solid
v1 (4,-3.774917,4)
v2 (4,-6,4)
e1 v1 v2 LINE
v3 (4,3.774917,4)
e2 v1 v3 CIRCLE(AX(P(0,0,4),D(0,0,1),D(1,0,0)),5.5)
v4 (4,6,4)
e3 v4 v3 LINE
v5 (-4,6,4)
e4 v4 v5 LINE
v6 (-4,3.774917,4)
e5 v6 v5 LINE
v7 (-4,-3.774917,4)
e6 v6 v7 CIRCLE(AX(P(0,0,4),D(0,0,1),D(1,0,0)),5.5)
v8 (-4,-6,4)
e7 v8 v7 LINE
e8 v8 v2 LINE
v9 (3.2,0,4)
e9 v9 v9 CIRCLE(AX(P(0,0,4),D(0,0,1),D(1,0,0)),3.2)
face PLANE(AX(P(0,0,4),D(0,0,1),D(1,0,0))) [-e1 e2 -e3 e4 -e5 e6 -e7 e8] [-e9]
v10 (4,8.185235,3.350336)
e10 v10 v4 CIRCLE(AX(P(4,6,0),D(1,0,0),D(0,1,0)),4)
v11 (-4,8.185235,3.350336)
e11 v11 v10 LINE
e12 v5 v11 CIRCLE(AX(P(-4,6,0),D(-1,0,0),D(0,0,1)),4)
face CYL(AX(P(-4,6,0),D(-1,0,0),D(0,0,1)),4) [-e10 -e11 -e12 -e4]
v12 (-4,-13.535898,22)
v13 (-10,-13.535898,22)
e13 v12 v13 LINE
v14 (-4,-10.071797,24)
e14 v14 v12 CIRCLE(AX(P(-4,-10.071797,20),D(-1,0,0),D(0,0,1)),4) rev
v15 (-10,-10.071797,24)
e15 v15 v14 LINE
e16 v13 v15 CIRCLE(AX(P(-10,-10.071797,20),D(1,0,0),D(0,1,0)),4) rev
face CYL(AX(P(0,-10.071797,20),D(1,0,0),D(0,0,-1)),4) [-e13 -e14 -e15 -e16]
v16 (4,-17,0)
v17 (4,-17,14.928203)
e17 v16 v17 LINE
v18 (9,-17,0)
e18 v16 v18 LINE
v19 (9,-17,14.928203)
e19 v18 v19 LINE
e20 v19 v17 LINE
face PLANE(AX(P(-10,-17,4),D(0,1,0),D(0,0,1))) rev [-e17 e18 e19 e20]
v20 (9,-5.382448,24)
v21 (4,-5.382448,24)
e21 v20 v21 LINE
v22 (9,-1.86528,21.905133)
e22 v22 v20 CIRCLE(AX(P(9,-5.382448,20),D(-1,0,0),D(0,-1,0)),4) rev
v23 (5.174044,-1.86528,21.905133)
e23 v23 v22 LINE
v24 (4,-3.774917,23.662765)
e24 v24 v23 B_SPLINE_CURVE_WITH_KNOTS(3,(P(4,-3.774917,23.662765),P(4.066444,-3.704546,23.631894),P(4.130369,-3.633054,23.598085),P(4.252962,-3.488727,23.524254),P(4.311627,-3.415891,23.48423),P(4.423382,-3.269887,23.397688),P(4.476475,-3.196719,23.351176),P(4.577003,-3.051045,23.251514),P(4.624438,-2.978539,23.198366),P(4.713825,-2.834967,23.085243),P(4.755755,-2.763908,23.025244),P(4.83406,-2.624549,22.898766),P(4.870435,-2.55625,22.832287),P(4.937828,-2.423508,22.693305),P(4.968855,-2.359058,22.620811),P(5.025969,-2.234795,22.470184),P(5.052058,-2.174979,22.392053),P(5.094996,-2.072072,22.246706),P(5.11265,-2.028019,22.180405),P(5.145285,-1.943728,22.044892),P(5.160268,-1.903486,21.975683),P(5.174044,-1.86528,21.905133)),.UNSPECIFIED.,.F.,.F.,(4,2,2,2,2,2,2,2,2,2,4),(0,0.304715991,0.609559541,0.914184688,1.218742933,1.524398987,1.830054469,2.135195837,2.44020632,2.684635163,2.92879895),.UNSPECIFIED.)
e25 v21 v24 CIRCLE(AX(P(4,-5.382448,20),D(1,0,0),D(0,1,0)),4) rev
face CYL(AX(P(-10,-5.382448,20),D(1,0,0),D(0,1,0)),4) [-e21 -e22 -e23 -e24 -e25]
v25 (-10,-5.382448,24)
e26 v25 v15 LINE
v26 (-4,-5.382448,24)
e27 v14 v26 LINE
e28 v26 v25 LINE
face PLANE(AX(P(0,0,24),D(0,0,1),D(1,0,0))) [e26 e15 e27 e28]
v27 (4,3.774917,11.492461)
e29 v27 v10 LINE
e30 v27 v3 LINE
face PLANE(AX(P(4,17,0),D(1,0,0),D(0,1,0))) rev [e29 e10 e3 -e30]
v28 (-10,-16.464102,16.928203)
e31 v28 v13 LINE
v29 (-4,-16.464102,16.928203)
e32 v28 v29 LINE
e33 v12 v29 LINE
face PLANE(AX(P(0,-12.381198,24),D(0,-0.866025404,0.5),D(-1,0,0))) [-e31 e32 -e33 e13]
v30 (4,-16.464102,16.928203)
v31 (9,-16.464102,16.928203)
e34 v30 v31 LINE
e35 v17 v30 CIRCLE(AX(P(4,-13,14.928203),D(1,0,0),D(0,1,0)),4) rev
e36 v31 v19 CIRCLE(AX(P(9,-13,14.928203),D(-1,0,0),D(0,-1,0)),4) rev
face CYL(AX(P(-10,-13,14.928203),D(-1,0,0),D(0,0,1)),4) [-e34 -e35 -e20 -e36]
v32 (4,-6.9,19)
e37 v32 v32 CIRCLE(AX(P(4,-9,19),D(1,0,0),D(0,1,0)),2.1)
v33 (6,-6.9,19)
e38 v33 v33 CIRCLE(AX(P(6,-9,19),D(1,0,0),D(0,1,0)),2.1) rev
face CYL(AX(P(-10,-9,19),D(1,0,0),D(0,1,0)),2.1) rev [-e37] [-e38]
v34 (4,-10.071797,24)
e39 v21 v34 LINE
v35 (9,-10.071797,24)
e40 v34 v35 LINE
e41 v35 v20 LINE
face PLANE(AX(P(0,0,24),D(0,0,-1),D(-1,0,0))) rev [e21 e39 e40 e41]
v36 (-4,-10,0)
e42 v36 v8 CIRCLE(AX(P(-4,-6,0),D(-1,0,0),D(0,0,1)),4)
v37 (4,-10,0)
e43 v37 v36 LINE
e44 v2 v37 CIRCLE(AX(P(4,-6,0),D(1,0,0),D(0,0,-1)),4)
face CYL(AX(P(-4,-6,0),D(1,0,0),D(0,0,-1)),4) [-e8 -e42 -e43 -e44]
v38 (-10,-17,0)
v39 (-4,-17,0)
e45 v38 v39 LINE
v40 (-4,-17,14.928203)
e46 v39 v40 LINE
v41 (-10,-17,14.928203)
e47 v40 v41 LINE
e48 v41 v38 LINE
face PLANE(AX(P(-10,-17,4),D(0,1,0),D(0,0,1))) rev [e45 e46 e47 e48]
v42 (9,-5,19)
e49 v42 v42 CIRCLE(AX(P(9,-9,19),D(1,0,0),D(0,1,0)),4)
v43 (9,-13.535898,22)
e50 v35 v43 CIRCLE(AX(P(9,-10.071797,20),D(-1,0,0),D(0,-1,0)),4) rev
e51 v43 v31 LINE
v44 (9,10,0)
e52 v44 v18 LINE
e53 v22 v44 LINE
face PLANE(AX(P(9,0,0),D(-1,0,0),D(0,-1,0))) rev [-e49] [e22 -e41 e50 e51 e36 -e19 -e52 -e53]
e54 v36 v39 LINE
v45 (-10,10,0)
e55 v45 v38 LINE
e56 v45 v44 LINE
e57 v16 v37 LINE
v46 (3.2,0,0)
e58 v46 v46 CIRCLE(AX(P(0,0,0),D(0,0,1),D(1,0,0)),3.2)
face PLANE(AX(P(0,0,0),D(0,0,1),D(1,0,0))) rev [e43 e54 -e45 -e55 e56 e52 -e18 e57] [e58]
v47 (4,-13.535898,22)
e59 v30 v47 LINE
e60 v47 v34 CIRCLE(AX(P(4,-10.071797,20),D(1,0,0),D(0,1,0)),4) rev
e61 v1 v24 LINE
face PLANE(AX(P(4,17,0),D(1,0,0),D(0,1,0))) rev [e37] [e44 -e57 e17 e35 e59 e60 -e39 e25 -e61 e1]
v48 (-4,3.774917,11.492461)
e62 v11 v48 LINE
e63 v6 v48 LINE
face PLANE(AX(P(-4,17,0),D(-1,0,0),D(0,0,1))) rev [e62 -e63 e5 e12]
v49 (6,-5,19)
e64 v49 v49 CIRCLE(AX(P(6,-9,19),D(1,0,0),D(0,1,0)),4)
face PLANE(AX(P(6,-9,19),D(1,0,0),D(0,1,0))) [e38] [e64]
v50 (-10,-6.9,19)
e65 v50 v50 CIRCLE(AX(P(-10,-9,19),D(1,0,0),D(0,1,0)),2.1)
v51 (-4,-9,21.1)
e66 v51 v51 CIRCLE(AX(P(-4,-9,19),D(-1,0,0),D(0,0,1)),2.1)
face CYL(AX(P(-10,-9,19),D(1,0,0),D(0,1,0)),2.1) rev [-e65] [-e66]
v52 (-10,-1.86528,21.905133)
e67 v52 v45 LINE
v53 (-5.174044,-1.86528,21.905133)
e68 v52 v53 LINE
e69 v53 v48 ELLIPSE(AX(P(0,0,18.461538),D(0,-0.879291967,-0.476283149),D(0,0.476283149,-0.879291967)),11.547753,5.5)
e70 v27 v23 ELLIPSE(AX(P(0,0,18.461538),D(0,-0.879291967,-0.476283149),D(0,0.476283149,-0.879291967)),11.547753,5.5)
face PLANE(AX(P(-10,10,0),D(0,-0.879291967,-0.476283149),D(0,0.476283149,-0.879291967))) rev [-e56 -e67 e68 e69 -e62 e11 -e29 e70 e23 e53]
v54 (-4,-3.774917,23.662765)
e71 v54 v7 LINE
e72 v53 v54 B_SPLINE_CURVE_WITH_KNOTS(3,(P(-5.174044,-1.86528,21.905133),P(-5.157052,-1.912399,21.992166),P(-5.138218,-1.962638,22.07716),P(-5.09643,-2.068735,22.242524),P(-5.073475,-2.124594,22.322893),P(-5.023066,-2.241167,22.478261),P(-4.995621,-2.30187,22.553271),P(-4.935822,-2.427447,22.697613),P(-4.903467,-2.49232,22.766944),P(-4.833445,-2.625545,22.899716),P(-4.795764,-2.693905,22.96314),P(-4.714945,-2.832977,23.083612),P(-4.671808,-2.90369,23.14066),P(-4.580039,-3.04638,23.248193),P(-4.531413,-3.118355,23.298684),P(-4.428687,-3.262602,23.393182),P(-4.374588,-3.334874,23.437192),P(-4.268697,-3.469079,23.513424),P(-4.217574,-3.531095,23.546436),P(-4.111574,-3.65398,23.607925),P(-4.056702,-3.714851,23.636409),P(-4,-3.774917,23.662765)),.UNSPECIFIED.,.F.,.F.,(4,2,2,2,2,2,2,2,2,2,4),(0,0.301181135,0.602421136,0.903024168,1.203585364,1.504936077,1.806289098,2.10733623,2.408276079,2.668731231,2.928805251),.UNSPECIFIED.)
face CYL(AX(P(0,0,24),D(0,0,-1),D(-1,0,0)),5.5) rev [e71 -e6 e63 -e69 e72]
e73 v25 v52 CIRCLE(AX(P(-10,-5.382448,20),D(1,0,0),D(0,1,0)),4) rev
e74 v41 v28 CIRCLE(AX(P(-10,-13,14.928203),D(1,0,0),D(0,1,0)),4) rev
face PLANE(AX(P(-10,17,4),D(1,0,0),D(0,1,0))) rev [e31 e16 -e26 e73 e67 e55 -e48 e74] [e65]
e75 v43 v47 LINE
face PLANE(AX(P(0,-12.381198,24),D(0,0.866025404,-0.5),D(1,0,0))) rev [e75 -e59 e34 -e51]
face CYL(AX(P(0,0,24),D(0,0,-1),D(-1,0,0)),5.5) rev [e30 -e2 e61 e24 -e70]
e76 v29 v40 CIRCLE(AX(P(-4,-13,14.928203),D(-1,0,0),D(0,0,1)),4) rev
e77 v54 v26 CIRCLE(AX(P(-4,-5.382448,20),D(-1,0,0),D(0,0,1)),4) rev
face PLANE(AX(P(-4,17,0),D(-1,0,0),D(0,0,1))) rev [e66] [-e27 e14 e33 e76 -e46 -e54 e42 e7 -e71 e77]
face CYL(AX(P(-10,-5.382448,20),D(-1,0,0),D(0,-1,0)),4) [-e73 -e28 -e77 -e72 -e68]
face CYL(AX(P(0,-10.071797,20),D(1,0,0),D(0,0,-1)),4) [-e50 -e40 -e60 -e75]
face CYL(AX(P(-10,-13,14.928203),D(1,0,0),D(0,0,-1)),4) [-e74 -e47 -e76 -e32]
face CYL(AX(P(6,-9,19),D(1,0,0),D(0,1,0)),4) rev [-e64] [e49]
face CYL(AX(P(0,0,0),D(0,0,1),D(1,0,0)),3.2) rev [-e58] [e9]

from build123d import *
from OCP.BRepFilletAPI import BRepFilletAPI_MakeChamfer

# Parameters (mm, degrees)
ESQUISSE1_W             = 20
ESQUISSE1_H             = 34
BOSS_EXTRU_1_DEPTH      = 4
ESQUISSE2_W             = 8
ESQUISSE2_H             = 7
ENL_V_MAT_EXTRU_1_DEPTH = 21.124611797
CONG_1_R                = 4
ESQUISSE3_W             = 6
ESQUISSE3_H             = 34
BOSS_EXTRU_2_DEPTH      = 20
ESQUISSE4_R             = 2.1
ENL_V_MAT_EXTRU_2_DEPTH = 36.566838488
CHANFREIN1_SIZE         = 8
CHANFREIN1_SIZE2        = 4.618802154
CONG_2_R                = 4
ESQUISSE5_R             = 3.2
ENL_V_MAT_EXTRU_3_DEPTH = 29.08914381
ESQUISSE6_R             = 5.5
ENL_V_MAT_EXTRU_4_DEPTH = 29.08914381
ENL_V_MAT_EXTRU_5_DEPTH = 36.566838488
CONG_3_R                = 4
ESQUISSE9_W             = 30.59391243
ESQUISSE9_H             = 32.996523038
ENL_V_MAT_EXTRU_6_DEPTH = 1
ESQUISSE10_R            = 4
ENL_V_MAT_EXTRU_7_DEPTH = 3


with BuildPart() as part:
    # Esquisse1 → Boss.-Extru.1 (new body)
    with BuildSketch(Plane.XY):
        Rectangle(ESQUISSE1_W, ESQUISSE1_H)
    extrude(amount=BOSS_EXTRU_1_DEPTH)

    # Esquisse2 → Enlèv. mat.-Extru.1 (cut, through all)
    with BuildSketch(Plane.XY.offset(4)):
        with Locations((0, 13.5)):
            Rectangle(ESQUISSE2_W, ESQUISSE2_H)
        with Locations((0, -13.5)):
            Rectangle(ESQUISSE2_W, ESQUISSE2_H)
    extrude(amount=-ENL_V_MAT_EXTRU_1_DEPTH, mode=Mode.SUBTRACT)

    # Congé1
    cong_1_edges = [part.edges().sort_by_distance(p)[0] for p in [
        (0, -10, 4),
        (0, 10, 4),
    ]]
    fillet(cong_1_edges, radius=CONG_1_R - 0.0001)  # a hair under: the kernel refuses the full size

    # Esquisse3 → Boss.-Extru.2 (add)
    with BuildSketch(Plane.XY.offset(4)):
        with Locations((-7, 0)):
            Rectangle(ESQUISSE3_W, ESQUISSE3_H)
        with Locations((7, 0)):
            Rectangle(ESQUISSE3_W, ESQUISSE3_H)
    extrude(amount=BOSS_EXTRU_2_DEPTH)

    # Esquisse4 → Enlèv. mat.-Extru.2 (cut, through all)
    with BuildSketch(Plane(origin=(10, 0, 0), x_dir=(0, 0, -1), z_dir=(1, 0, 0))):
        with Locations(Location((-19, 9, 0), (0, 0, 90))):
            Circle(ESQUISSE4_R)
        with Locations(Location((-19, -9, 0), (0, 0, 90))):
            Circle(ESQUISSE4_R)
    extrude(amount=-ENL_V_MAT_EXTRU_2_DEPTH, mode=Mode.SUBTRACT)

    # Chanfrein1: one chamfer whose edges measure the first distance from different faces: ONE call of the kernel's chamfer builder (chamfer() names one face for all edges)
    chanfrein1_edges_1 = [part.edges().sort_by_distance(p)[0] for p in [
        (-7, -17, 24),
    ]]
    chanfrein1_side_1 = [part.faces().sort_by_distance(p)[0] for p in [
        (-7, -17, 12),
    ]]
    chanfrein1_edges_2 = [part.edges().sort_by_distance(p)[0] for p in [
        (-7, 17, 24),
    ]]
    chanfrein1_side_2 = [part.faces().sort_by_distance(p)[0] for p in [
        (-7, 17, 12),
    ]]
    chanfrein1_edges_3 = [part.edges().sort_by_distance(p)[0] for p in [
        (7, -17, 24),
    ]]
    chanfrein1_side_3 = [part.faces().sort_by_distance(p)[0] for p in [
        (7, -17, 12),
    ]]
    chanfrein1_edges_4 = [part.edges().sort_by_distance(p)[0] for p in [
        (7, 17, 24),
    ]]
    chanfrein1_side_4 = [part.faces().sort_by_distance(p)[0] for p in [
        (7, 17, 12),
    ]]
    chanfrein1 = BRepFilletAPI_MakeChamfer(part.part.solid().wrapped)
    for e in chanfrein1_edges_1:
        chanfrein1.Add(CHANFREIN1_SIZE, CHANFREIN1_SIZE2, e.wrapped, chanfrein1_side_1[0].wrapped)  # the first distance lies on this face
    for e in chanfrein1_edges_2:
        chanfrein1.Add(CHANFREIN1_SIZE, CHANFREIN1_SIZE2, e.wrapped, chanfrein1_side_2[0].wrapped)  # the first distance lies on this face
    for e in chanfrein1_edges_3:
        chanfrein1.Add(CHANFREIN1_SIZE, CHANFREIN1_SIZE2, e.wrapped, chanfrein1_side_3[0].wrapped)  # the first distance lies on this face
    for e in chanfrein1_edges_4:
        chanfrein1.Add(CHANFREIN1_SIZE, CHANFREIN1_SIZE2, e.wrapped, chanfrein1_side_4[0].wrapped)  # the first distance lies on this face
    add(Compound.cast(chanfrein1.Shape()), mode=Mode.REPLACE)

    # Congé2
    cong_2_edges = [part.edges().sort_by_distance(p)[0] for p in [
        (-7, 12.381197846, 24),
        (-7, -12.381197846, 24),
        (-7, -17, 16),
        (7, 12.381197846, 24),
        (7, -12.381197846, 24),
        (7, -17, 16),
        (-7, 17, 16),
        (7, 17, 16),
    ]]
    fillet(cong_2_edges, radius=CONG_2_R)

    # Esquisse5 → Enlèv. mat.-Extru.3 (cut, through all)
    with BuildSketch(Plane.XY.offset(4)):
        Circle(ESQUISSE5_R)
    extrude(amount=-ENL_V_MAT_EXTRU_3_DEPTH, mode=Mode.SUBTRACT)

    # Esquisse6 → Enlèv. mat.-Extru.4 (cut, through all)
    with BuildSketch(Plane.XY.offset(4)):
        Circle(ESQUISSE6_R)
    extrude(amount=ENL_V_MAT_EXTRU_4_DEPTH, mode=Mode.SUBTRACT)

    # Esquisse8 → Enlèv. mat.-Extru.5 (cut, through all)
    with BuildSketch(Plane(origin=(10, 0, 0), x_dir=(0, 0, -1), z_dir=(1, 0, 0))):
        Polygon((0, 17), (0, 10), (-24, -3), (-24, 17), align=None)
    extrude(amount=-ENL_V_MAT_EXTRU_5_DEPTH, mode=Mode.SUBTRACT)

    # Congé3
    cong_3_edges = [part.edges().sort_by_distance(p)[0] for p in [
        (7.304886114, -3, 24),
        (-7.304886114, -3, 24),
    ]]
    fillet(cong_3_edges, radius=CONG_3_R)

    # Esquisse9 → Enlèv. mat.-Extru.6 (cut)
    with BuildSketch(Plane(origin=(10, 0, 0), x_dir=(0, 0, -1), z_dir=(1, 0, 0))):
        with Locations((-11.472185, -1.799431883)):
            Rectangle(ESQUISSE9_W, ESQUISSE9_H)
    extrude(amount=-ENL_V_MAT_EXTRU_6_DEPTH, mode=Mode.SUBTRACT)

    # Esquisse10 → Enlèv. mat.-Extru.7 (cut)
    with BuildSketch(Plane(origin=(9, 0, 0), x_dir=(0, 0, -1), z_dir=(1, 0, 0))):
        with Locations(Location((-19, -9, 0), (0, 0, 90))):
            Circle(ESQUISSE10_R)
    extrude(amount=-ENL_V_MAT_EXTRU_7_DEPTH, mode=Mode.SUBTRACT)


solid = part.part
